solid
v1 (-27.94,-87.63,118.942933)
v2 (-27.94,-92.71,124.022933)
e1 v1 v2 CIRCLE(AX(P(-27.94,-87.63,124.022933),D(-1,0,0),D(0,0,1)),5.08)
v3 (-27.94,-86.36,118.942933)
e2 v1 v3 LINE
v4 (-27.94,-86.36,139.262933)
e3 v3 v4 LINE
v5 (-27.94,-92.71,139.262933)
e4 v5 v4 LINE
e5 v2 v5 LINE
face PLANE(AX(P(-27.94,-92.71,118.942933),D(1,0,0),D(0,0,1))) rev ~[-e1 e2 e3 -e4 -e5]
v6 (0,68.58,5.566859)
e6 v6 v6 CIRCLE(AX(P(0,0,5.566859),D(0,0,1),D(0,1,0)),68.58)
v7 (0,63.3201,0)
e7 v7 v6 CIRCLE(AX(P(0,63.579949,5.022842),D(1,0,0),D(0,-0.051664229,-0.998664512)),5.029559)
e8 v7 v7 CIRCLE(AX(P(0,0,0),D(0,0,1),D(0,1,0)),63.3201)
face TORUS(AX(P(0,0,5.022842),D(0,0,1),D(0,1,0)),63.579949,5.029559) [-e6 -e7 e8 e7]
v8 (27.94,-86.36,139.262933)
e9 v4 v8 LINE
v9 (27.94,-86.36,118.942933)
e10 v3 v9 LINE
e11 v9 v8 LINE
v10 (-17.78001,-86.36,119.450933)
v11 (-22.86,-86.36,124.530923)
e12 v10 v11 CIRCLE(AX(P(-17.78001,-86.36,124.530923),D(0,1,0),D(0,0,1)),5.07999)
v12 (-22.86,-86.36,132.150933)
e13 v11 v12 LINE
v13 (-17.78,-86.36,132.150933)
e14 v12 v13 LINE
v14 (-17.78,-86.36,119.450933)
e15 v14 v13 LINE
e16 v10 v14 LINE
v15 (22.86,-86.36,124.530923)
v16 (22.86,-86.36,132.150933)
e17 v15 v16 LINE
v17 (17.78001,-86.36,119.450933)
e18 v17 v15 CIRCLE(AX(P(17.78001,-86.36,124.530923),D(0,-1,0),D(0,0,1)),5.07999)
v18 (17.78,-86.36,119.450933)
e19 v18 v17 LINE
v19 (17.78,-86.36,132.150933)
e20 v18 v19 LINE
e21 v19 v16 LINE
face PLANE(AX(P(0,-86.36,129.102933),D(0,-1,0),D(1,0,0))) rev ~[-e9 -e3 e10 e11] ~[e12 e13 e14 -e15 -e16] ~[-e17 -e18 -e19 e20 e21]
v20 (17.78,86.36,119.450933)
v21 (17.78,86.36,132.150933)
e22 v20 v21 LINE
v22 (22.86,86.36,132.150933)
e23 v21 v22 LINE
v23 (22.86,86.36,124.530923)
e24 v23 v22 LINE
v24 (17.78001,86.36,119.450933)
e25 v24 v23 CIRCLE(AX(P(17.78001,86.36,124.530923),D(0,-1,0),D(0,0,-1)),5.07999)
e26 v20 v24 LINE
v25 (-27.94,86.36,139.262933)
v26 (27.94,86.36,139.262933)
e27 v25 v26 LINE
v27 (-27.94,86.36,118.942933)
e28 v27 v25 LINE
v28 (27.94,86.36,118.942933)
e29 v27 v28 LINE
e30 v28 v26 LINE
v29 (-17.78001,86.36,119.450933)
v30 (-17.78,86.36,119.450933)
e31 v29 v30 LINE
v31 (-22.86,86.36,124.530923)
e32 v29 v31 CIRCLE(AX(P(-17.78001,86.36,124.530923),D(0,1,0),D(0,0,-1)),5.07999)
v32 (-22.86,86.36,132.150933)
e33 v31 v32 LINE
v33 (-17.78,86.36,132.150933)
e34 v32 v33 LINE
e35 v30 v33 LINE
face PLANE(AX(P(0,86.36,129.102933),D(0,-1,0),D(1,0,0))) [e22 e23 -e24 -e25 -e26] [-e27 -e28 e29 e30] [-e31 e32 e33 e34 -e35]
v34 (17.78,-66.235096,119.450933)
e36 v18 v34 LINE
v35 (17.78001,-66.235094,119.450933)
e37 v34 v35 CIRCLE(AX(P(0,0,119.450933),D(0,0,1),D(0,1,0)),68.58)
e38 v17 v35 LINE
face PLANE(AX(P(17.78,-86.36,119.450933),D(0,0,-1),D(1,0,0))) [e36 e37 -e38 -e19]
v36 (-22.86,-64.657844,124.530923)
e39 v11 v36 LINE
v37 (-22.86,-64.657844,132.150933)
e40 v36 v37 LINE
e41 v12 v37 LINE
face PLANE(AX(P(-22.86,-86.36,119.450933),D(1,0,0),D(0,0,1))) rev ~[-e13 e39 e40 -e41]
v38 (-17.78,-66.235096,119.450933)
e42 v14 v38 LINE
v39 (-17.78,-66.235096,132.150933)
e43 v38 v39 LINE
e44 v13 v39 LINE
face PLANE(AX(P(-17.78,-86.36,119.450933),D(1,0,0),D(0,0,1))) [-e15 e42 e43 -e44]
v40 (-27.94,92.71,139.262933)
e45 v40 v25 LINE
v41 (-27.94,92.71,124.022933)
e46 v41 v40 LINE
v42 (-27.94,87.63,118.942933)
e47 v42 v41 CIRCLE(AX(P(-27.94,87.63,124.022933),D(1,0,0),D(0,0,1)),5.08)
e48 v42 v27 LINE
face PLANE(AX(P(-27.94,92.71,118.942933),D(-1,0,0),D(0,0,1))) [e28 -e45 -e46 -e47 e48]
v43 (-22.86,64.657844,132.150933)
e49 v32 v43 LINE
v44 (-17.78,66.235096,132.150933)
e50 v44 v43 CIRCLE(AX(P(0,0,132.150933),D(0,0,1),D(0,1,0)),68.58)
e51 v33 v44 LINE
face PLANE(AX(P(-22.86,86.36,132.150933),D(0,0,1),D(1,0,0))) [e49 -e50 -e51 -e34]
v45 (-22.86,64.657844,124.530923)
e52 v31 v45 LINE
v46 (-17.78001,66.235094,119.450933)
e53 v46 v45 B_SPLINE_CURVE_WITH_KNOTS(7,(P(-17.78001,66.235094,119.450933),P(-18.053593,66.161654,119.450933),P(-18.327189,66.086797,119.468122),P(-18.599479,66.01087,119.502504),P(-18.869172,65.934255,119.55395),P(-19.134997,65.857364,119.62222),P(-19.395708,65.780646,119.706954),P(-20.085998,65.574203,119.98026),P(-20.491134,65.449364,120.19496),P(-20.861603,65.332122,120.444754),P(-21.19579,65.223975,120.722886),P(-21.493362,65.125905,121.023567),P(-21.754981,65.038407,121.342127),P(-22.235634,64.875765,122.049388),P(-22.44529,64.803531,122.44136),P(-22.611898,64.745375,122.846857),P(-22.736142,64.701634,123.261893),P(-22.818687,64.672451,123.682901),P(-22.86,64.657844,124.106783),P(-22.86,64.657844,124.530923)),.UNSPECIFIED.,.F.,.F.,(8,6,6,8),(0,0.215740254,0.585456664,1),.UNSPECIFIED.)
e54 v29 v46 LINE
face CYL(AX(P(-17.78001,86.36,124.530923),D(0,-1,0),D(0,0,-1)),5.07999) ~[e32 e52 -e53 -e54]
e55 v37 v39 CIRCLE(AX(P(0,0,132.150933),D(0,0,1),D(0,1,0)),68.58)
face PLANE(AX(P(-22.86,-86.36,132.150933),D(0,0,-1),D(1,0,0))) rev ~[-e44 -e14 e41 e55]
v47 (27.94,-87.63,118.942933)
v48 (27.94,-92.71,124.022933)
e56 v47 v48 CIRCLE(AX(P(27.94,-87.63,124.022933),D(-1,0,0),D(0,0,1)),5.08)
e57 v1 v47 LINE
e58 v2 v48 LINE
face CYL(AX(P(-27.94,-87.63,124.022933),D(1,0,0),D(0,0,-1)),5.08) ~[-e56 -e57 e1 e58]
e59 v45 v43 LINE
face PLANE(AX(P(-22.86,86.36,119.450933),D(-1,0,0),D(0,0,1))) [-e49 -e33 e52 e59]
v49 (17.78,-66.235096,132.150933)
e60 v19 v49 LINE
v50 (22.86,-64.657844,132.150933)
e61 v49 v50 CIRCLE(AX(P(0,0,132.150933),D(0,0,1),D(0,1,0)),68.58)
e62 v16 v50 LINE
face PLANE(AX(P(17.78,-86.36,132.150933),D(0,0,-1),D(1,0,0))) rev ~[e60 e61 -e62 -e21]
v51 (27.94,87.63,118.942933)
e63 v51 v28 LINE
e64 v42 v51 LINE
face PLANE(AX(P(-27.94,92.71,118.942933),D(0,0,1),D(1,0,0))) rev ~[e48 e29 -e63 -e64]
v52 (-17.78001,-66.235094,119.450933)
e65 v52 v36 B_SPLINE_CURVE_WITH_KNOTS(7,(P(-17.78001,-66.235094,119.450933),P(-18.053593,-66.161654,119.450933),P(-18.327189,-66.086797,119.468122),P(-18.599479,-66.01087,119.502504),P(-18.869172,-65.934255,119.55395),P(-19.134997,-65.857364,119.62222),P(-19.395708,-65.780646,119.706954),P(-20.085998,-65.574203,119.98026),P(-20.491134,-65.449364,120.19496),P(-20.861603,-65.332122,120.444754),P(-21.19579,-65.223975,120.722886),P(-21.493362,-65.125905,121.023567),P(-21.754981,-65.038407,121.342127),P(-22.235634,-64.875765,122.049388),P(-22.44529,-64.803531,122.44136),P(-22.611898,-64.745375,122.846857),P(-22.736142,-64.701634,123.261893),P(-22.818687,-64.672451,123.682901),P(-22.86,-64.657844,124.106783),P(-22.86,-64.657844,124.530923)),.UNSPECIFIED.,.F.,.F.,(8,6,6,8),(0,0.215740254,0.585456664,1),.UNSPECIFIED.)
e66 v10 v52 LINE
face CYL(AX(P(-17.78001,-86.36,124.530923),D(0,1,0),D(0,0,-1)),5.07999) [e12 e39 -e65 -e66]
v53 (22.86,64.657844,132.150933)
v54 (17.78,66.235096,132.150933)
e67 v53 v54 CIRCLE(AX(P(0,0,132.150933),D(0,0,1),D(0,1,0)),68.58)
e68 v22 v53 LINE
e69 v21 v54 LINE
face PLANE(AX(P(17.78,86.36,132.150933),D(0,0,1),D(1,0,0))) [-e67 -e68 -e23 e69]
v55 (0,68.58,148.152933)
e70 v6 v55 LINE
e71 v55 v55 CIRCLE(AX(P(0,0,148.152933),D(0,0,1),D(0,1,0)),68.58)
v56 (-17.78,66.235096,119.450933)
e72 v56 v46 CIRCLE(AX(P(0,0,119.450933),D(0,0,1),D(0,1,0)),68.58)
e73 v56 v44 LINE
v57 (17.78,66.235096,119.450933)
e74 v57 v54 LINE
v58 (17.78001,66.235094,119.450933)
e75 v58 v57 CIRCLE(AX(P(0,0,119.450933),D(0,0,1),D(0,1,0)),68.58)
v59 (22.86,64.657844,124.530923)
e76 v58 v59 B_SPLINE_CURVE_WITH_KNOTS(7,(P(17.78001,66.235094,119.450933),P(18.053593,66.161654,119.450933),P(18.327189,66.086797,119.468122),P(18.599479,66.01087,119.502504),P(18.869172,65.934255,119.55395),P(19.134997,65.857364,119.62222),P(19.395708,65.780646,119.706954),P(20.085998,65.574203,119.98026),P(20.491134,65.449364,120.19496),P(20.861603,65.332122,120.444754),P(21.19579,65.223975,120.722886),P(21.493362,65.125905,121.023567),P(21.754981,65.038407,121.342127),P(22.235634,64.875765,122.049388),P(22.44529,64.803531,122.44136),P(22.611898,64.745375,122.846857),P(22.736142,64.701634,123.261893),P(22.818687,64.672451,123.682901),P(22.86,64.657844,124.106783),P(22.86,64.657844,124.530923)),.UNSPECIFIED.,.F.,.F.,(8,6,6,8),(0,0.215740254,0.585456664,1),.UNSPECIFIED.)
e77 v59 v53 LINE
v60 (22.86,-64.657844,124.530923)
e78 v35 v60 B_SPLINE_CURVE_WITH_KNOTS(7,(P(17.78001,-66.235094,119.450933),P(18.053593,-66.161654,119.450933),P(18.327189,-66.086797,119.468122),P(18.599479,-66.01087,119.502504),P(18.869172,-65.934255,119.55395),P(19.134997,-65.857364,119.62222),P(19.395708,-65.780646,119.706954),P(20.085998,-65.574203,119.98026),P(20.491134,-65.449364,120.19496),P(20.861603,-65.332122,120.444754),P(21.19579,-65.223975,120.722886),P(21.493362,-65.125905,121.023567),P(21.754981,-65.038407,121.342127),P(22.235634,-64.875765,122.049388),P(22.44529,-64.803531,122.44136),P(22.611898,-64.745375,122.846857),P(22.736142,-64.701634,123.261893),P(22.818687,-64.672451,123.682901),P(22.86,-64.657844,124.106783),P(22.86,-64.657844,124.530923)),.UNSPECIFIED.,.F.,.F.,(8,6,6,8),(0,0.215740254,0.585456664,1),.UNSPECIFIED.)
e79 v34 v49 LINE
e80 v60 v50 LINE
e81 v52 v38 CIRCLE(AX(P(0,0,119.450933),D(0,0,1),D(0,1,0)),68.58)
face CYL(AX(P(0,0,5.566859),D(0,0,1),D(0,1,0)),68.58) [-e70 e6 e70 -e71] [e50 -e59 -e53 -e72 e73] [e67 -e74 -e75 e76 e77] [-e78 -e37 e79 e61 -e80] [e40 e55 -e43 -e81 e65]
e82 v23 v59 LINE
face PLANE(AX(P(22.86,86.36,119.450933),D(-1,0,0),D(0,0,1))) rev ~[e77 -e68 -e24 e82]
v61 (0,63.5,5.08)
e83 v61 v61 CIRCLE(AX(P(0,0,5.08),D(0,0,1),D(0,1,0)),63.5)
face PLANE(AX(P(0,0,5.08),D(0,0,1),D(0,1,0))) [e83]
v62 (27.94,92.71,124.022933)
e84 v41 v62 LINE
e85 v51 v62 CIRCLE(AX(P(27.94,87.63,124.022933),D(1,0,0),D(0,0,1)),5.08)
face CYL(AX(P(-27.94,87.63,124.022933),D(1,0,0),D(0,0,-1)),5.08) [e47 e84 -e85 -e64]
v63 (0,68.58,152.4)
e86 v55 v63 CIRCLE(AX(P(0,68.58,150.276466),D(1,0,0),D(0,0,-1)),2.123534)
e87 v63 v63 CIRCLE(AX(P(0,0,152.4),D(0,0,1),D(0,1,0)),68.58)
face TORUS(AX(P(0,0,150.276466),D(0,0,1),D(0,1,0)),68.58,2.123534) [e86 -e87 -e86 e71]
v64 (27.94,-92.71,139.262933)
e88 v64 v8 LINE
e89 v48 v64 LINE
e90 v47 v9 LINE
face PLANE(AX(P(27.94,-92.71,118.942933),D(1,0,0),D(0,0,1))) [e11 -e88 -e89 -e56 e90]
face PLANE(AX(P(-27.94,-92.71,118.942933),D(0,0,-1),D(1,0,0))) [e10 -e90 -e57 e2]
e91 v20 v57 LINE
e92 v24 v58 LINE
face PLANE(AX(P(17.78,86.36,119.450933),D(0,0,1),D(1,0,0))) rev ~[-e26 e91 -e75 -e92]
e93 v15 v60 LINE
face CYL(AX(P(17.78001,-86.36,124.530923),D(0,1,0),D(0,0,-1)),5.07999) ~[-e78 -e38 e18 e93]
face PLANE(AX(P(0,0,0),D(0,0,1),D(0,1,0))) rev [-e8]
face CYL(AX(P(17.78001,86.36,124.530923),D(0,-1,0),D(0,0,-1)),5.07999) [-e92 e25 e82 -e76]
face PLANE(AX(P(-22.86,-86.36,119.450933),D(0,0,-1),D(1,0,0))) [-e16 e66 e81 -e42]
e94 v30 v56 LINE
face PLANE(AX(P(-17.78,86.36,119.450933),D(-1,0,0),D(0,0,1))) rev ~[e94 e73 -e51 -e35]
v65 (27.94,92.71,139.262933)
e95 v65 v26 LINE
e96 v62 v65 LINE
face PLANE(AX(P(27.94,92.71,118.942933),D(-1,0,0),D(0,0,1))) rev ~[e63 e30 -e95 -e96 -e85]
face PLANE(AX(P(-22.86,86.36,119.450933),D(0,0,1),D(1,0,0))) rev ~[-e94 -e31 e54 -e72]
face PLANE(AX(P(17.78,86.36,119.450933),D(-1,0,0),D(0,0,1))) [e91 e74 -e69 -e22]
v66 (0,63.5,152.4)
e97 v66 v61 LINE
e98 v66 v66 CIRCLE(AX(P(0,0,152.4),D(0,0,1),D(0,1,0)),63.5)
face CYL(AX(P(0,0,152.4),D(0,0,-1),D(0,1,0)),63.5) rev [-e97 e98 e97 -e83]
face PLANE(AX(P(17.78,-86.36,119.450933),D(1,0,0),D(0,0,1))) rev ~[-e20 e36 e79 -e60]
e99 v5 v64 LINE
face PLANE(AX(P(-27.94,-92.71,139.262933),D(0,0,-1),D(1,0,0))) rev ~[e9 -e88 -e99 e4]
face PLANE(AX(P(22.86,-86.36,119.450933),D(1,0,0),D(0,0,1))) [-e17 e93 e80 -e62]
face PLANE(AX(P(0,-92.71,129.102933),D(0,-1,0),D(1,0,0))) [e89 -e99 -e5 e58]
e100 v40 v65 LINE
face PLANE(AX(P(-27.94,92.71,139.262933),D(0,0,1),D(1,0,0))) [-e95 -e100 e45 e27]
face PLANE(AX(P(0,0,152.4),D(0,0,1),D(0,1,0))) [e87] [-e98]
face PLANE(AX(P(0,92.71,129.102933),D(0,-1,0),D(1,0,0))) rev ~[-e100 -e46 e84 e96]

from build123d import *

# Parameters (mm, degrees)
F3_W      = 5.08
F3_H      = 12.7
F6_W      = 55.88
F6_H      = 20.32
F7_DEPTH  = 6.35
F10_W     = 5.08
F10_H     = 12.7
F12_W     = 55.88
F12_H     = 20.32
F13_DEPTH = 6.35
F14_R     = 5.08
F15_R     = 5.08
F16_R     = 5.07999


# Not quite as in the source:
# - a fillet or chamfer is up to 0.001 mm smaller than in the source, because OpenCascade refuses the exact size


with BuildPart() as f1:
    # F0 (on Right) → F1 (revolve)
    with BuildSketch(Plane.YZ):
        with BuildLine():
            Line((63.5, 5.08), (0, 5.08))
            Line((0, 5.08), (0, 0))
            Line((0, 0), (63.3201003075, 0))
            ThreePointArc((63.3201003075, 0), (67.2357467781, 1.5686265864), (68.58, 5.5668586865))
            Line((68.58, 5.5668586865), (68.58, 148.1529325247))
            ThreePointArc((68.58, 148.1529325247), (70.7035337377, 150.2764662623), (68.58, 152.4))
            Line((68.58, 152.4), (63.5, 152.4))
            Line((63.5, 152.4), (63.5, 5.08))
        make_face()
    revolve(axis=Axis((0, 0, 2.54), (0, 0, 1)))

    # F3 (on offset) → F4 (join, up to the next surface of F1)
    with BuildSketch(Plane.XZ.offset(86.36)):
        with Locations((-20.32, 125.8009325247)):
            Rectangle(F3_W, F3_H)
        with Locations((20.32, 125.8009325247)):
            Rectangle(F3_W, F3_H)
    extrude(until=Until.NEXT, dir=(0, 1, 0))

    # F6 (on offset) → F7 (join, through all)
    with BuildSketch(Plane.XZ.offset(92.71)):
        with Locations((0, 129.1029325247)):
            Rectangle(F6_W, F6_H)
    extrude(amount=-F7_DEPTH)

    # F10 (on offset) → F11 (join, up to the next surface of F1)
    with BuildSketch(Plane.XZ.offset(-86.36)):
        with Locations((20.32, 125.8009325247)):
            Rectangle(F10_W, F10_H)
        with Locations((-20.32, 125.8009325247)):
            Rectangle(F10_W, F10_H)
    extrude(until=Until.NEXT)

    # F12 (on offset) → F13 (join, through all)
    with BuildSketch(Plane.XZ.offset(-92.71)):
        with Locations((0, 129.1029325247)):
            Rectangle(F12_W, F12_H)
    extrude(amount=F13_DEPTH)

    # F14
    f14_edges = [f1.edges().sort_by_distance(p)[0] for p in [
        (0, -92.71, 118.942933),
    ]]
    fillet(f14_edges, radius=F14_R)

    # F15
    f15_edges = [f1.edges().sort_by_distance(p)[0] for p in [
        (0, 92.71, 118.942933),
    ]]
    fillet(f15_edges, radius=F15_R)

    # F16 (radius 5.08 in the source; OpenCascade refuses exactly that, so slightly less here)
    f16_edges = [f1.edges().sort_by_distance(p)[0] for p in [
        (-22.86, 75.508922, 119.450933),
        (22.86, 75.508922, 119.450933),
        (-22.86, -75.508922, 119.450933),
        (22.86, -75.508922, 119.450933),
    ]]
    fillet(f16_edges, radius=F16_R)


solid = f1.part
